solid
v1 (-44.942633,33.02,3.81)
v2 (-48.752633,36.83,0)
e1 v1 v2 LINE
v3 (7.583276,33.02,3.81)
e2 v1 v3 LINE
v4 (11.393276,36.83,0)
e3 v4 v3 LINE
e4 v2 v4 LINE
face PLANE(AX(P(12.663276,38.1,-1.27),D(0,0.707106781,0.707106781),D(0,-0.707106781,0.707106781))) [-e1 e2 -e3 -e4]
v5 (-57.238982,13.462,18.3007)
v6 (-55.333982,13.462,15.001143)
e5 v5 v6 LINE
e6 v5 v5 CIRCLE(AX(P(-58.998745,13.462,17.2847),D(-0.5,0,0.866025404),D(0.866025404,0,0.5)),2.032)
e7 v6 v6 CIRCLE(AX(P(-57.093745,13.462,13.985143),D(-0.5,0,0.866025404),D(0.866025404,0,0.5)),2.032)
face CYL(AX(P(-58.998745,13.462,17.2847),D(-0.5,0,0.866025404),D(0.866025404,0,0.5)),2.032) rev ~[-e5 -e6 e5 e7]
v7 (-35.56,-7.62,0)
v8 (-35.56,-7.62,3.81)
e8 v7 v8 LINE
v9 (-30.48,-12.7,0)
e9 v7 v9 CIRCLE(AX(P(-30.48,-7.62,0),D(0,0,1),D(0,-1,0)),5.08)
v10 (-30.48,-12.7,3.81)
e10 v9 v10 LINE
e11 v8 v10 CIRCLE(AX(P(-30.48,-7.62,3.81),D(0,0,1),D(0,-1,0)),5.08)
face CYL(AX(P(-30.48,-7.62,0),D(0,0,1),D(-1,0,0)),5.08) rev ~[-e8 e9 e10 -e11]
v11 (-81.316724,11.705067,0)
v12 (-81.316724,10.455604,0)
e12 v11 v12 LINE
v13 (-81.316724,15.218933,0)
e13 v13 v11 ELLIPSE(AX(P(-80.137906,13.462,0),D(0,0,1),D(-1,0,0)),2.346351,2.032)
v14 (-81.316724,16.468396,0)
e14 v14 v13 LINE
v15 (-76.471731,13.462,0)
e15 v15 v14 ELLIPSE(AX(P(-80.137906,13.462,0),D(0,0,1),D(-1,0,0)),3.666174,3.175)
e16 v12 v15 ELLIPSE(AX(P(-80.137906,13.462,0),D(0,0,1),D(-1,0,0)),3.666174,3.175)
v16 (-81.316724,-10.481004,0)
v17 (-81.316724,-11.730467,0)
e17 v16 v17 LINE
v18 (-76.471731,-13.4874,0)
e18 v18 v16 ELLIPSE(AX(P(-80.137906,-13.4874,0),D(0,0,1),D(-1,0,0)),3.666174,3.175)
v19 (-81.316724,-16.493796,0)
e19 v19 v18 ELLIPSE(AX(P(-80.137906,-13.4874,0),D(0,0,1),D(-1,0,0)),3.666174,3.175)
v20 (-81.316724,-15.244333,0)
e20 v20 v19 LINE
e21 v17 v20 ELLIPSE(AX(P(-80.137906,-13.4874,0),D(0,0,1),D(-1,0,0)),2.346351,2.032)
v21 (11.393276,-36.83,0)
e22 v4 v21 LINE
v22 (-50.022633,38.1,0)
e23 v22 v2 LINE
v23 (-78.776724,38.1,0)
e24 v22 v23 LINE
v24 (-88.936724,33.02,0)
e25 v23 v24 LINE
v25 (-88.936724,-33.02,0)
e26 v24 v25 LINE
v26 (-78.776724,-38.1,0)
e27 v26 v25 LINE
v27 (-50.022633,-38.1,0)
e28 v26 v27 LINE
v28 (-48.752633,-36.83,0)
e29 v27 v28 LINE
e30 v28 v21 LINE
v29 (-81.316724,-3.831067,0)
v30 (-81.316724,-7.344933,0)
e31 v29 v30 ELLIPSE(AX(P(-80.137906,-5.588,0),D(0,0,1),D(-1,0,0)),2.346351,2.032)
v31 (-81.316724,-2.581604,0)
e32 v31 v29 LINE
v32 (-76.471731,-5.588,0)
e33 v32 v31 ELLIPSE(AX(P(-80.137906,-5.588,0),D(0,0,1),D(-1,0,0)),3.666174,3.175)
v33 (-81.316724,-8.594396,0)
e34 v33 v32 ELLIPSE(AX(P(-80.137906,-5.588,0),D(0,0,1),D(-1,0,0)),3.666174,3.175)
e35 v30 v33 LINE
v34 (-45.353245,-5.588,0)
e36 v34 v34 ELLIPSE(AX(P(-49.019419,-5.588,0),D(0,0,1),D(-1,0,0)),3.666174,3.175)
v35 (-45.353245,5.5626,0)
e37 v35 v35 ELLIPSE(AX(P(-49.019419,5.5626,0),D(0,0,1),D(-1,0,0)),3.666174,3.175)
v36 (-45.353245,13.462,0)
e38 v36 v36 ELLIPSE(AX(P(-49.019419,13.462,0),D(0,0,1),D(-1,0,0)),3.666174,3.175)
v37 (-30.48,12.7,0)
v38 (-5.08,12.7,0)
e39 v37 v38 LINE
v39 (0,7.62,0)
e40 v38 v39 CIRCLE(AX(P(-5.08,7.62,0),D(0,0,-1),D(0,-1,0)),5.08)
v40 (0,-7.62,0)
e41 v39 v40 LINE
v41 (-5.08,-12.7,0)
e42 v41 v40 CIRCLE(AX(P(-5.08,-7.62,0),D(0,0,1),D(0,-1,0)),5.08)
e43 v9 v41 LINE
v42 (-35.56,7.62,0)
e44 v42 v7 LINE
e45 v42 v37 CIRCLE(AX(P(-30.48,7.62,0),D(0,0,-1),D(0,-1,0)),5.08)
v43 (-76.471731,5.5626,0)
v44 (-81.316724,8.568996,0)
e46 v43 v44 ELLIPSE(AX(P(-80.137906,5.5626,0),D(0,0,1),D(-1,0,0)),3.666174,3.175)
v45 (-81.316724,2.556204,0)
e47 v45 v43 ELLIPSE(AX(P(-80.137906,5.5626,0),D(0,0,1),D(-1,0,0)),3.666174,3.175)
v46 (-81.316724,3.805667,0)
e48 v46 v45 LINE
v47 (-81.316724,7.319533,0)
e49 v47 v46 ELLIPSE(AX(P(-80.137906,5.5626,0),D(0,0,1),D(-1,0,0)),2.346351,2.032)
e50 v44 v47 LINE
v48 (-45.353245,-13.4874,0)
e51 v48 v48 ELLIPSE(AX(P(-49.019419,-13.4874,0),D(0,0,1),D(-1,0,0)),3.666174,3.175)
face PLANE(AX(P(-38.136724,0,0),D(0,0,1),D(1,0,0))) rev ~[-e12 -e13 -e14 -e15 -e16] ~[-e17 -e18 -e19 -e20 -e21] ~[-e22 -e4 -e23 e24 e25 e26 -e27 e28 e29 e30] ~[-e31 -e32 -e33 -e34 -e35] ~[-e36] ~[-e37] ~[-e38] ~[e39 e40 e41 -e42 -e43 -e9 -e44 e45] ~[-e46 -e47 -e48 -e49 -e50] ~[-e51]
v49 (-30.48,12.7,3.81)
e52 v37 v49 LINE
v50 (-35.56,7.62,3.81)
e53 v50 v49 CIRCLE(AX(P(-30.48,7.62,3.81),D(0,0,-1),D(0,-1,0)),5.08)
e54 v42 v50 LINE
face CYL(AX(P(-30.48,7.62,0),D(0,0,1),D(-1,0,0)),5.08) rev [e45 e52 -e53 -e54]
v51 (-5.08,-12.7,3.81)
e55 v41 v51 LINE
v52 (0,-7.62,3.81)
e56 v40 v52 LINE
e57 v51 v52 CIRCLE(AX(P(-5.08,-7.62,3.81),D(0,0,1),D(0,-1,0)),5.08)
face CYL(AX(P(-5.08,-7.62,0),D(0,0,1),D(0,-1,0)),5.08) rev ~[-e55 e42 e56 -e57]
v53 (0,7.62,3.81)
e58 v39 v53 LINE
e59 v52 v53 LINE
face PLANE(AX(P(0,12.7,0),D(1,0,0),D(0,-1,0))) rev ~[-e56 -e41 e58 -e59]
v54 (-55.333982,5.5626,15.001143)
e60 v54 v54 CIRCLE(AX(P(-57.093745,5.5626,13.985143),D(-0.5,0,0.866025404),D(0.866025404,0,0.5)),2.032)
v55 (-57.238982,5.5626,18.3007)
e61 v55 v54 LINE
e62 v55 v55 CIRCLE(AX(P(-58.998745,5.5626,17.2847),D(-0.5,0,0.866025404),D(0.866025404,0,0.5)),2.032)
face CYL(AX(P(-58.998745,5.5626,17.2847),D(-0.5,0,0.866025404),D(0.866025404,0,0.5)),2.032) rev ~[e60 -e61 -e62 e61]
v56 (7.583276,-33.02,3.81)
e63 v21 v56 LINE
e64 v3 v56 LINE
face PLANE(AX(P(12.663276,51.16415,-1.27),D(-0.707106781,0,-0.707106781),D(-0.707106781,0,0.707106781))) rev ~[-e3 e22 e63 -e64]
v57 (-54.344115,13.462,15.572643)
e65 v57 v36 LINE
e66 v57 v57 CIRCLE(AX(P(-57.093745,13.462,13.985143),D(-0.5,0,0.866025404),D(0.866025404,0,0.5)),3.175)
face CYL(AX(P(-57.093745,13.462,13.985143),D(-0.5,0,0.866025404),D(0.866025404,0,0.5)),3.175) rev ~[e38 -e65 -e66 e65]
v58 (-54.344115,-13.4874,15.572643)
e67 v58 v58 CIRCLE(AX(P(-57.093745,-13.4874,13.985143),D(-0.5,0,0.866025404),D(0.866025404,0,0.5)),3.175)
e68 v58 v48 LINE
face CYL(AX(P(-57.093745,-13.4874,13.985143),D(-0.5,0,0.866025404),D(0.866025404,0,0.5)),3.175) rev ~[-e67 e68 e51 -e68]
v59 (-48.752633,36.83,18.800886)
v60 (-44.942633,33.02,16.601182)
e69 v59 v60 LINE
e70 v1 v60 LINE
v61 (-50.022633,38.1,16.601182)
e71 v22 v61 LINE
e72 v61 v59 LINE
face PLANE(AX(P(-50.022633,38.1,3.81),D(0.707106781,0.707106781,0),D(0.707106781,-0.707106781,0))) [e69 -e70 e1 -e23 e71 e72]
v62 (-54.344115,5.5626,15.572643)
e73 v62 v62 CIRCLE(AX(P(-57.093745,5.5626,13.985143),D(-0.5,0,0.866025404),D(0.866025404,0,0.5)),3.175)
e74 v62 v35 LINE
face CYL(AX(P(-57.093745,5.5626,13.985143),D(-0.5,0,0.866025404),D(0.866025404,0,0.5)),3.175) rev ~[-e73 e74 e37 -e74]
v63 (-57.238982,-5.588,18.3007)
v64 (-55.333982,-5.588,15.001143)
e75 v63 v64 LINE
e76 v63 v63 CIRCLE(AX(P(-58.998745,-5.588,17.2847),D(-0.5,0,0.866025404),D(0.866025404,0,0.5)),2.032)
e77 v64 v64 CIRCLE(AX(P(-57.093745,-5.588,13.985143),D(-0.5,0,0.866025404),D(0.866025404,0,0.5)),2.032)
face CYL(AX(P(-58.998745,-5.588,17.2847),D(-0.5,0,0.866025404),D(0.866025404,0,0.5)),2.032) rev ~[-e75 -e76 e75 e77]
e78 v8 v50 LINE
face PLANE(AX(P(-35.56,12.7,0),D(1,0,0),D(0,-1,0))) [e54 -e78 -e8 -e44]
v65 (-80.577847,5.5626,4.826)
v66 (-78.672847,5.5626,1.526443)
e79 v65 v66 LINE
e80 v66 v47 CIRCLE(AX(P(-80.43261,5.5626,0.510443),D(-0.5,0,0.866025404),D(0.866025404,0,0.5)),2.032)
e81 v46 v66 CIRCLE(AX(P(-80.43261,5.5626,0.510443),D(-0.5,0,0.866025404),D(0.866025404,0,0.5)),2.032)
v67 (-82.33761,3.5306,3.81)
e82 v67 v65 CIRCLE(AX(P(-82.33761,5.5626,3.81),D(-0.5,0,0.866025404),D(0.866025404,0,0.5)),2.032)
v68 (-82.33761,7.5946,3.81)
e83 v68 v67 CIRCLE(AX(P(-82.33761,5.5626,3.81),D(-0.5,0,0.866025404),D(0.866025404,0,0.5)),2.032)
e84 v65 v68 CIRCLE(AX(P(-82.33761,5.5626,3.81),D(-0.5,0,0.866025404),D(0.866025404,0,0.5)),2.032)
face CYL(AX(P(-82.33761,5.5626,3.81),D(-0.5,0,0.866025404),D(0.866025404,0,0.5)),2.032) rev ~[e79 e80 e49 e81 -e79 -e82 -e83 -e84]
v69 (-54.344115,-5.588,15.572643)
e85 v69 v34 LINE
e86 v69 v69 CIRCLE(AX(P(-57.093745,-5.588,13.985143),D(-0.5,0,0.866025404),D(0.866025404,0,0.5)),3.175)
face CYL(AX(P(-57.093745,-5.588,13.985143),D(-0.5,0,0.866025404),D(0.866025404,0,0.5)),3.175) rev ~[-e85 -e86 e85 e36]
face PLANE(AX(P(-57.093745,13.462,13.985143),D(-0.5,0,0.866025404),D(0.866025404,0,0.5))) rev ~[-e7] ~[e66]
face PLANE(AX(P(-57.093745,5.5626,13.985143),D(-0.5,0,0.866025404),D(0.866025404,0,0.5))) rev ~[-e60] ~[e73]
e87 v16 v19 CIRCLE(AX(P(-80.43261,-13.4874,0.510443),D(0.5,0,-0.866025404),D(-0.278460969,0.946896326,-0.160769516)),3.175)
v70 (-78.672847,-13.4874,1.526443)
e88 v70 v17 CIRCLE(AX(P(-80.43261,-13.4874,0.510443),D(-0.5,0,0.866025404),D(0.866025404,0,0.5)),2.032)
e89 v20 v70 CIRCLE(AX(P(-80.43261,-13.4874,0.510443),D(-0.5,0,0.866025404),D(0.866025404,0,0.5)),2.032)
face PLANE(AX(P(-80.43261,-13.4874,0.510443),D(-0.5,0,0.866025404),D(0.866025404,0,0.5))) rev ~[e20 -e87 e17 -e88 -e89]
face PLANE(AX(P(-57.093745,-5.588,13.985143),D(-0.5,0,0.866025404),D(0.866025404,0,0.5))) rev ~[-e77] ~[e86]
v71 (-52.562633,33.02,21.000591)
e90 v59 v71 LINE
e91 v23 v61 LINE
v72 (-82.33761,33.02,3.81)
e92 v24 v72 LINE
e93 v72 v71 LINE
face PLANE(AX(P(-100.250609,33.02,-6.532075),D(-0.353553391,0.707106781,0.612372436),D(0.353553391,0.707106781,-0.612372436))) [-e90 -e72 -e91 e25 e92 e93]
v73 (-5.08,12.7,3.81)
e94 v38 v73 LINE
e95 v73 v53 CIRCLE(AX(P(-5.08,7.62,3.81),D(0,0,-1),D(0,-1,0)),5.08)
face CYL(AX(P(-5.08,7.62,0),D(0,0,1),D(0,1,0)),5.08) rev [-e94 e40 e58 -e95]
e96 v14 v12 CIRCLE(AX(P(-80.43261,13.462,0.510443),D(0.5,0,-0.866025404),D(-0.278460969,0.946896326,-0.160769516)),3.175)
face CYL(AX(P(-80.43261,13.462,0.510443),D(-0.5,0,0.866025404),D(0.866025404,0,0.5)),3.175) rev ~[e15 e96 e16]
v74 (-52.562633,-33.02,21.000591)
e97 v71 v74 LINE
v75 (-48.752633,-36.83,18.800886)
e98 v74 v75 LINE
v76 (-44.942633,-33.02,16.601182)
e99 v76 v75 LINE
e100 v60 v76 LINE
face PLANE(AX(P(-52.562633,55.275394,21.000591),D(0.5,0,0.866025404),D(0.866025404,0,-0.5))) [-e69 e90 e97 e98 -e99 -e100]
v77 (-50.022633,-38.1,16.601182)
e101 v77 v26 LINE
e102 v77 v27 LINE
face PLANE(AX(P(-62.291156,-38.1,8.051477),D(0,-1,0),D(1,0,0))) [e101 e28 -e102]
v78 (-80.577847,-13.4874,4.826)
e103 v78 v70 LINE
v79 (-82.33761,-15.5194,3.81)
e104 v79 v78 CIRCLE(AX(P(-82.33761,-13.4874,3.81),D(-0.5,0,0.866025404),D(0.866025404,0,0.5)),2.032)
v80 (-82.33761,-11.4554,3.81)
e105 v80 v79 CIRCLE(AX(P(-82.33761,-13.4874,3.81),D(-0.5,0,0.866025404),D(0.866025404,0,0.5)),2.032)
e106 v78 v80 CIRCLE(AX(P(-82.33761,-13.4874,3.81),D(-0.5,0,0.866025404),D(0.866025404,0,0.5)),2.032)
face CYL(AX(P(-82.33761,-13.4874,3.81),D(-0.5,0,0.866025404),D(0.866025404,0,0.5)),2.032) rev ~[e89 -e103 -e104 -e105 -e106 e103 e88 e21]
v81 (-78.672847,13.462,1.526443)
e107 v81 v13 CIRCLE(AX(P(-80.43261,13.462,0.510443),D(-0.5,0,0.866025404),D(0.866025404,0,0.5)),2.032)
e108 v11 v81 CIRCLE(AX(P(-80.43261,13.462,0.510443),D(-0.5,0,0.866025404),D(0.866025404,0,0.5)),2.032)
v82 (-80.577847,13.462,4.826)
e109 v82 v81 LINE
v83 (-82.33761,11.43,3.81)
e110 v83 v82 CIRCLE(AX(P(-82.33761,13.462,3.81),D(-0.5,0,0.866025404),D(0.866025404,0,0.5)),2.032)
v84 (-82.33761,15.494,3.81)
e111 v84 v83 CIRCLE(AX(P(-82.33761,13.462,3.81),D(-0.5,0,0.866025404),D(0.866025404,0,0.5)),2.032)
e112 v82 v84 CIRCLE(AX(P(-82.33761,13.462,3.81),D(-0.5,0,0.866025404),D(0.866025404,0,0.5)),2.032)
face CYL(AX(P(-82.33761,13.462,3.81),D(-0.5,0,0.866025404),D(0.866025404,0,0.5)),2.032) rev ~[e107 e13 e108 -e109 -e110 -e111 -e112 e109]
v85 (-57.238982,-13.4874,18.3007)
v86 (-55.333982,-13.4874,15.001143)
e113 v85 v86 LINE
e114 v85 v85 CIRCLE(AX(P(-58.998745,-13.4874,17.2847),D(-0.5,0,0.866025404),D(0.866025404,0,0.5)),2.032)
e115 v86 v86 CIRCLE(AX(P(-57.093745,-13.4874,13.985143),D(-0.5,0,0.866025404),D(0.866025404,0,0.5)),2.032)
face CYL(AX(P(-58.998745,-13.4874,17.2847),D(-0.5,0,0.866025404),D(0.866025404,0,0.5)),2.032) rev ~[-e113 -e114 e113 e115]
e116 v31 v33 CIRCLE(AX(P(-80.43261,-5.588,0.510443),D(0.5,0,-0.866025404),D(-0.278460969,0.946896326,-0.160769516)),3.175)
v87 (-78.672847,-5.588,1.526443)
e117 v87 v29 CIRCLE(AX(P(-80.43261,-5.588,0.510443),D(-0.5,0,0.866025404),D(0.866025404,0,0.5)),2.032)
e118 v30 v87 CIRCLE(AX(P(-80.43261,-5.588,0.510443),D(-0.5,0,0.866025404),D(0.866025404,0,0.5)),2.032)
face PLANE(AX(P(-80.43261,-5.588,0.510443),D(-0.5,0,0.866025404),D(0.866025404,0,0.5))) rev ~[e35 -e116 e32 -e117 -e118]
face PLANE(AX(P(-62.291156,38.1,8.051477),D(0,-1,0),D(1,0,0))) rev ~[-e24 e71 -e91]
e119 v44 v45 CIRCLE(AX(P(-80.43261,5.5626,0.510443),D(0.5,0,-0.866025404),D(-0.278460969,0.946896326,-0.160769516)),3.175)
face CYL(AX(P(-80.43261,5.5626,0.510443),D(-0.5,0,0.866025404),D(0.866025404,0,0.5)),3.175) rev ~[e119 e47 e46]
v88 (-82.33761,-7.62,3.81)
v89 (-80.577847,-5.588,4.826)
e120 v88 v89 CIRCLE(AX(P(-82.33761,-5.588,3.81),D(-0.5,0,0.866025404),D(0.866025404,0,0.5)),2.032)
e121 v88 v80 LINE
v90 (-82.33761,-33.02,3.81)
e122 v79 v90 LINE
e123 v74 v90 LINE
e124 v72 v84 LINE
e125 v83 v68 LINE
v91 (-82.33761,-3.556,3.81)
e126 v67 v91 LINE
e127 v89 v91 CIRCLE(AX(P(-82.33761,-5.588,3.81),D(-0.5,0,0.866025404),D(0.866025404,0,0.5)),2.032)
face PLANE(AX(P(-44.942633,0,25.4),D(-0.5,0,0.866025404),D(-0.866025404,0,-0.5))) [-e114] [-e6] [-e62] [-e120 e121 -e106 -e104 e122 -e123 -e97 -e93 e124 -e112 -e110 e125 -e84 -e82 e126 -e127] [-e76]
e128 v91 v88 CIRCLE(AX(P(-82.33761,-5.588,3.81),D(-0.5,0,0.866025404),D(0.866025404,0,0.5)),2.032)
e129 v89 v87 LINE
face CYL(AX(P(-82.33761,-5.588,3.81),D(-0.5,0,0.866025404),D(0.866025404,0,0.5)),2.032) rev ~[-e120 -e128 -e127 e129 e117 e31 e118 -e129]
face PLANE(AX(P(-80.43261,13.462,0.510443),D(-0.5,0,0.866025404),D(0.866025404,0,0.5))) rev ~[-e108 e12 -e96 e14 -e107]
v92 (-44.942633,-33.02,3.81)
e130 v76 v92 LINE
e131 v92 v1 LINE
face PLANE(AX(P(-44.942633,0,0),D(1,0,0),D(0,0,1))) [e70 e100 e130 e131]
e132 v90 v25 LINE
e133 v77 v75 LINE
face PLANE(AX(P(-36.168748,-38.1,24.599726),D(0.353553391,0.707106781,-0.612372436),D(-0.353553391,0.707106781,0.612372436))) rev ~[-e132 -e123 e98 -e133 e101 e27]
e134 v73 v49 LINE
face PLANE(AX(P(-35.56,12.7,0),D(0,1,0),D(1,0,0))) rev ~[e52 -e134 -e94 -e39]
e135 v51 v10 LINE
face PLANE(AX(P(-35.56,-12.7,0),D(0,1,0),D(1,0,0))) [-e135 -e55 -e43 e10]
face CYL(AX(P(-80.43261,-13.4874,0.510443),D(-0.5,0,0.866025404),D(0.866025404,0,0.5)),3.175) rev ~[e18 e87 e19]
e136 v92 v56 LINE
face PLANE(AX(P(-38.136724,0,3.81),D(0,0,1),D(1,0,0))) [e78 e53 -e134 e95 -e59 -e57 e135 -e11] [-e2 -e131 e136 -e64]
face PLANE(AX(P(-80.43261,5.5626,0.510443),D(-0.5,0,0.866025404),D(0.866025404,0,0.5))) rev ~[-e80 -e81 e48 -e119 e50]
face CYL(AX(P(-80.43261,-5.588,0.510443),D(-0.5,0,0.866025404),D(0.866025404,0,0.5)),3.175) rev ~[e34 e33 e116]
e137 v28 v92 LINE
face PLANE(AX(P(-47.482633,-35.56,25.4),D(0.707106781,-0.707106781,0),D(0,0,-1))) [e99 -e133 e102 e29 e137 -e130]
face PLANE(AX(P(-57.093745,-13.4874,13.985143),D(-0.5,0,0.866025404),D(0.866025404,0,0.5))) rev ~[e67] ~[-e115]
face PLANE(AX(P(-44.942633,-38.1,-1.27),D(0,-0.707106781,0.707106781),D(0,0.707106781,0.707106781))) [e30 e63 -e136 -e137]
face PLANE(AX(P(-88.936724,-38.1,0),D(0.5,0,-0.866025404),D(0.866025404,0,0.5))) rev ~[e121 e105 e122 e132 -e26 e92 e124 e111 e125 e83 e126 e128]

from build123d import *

# Parameters (mm, degrees)
F0_W          = 101.6
F0_H          = 76.2
F2_DEPTH      = 3.81
F3_DEPTH      = 38.1
F3_DEPTH_BACK = 38.1
F5_DEPTH      = 101.6
F6_R          = 2.032
F7_DEPTH      = 25.4
F9_R          = 3.175
F9_R_2        = 2.032
F10_DEPTH     = 25.4
F11_W         = 35.56
F11_H         = 25.4
F12_DEPTH     = 25.4
F13_T1_DEPTH  = 102.3282991577
F13_T3_DEPTH  = 70.6700590666
F13_T5_DEPTH  = 34.6541495789
F13_T11_DEPTH = 70.6700590666
F13_T16_DEPTH = 47.7182991577
F14_SIZE      = 5.08
F15_T1_DEPTH  = 71.0624204228
F15_T3_DEPTH  = 110.5507880402
F15_T5_DEPTH  = 71.0624204227
F16_R         = 5.08


# Not quite as in the source:
# - a fillet or chamfer that OpenCascade refuses, or shapes differently, is made with other operations: its cross-section is extruded or revolved along the edge and cut away or added


with BuildPart() as f2:
    # F0 (on Top) → F2 (new body)
    with BuildSketch(Plane.XY):
        with Locations((-38.1367237687, 0)):
            Rectangle(F0_W, F0_H)
    extrude(amount=F2_DEPTH)

    # F1 (on Front) → F3 (join, two sides)
    with BuildSketch(Plane.XZ) as f3_sk:
        Polygon((-44.9426332565, 25.4), (-88.9367237687, 0), (-44.9426332565, 0), align=None)
    extrude(amount=F3_DEPTH)
    extrude(f3_sk.sketch, amount=-F3_DEPTH_BACK)

    # F4 (on face) → F5 (cut)
    with BuildSketch(Plane.XZ.offset(38.1)):
        Polygon((-88.9367237687, 0), (-82.3376101919, 3.81), (-88.9367237687, 3.81), align=None)
    extrude(amount=-F5_DEPTH, mode=Mode.SUBTRACT)

    # F6 (on face) → F7 (cut)
    with BuildSketch(Plane(origin=(-22.2341809422, 0, 38.5107310565), x_dir=(0.8660254038, 0, 0.5), z_dir=(-0.5, 0, 0.8660254038))):
        with Locations((-69.4014621131, -13.4874)):
            Circle(F6_R)
        with Locations((-69.4014621131, -5.588)):
            Circle(F6_R)
        with Locations((-69.4014621131, 5.5626)):
            Circle(F6_R)
        with Locations((-69.4014621131, 13.462)):
            Circle(F6_R)
        with Locations((-42.4520621131, 13.462)):
            Circle(F6_R)
        with Locations((-42.4520621131, -5.588)):
            Circle(F6_R)
        with Locations((-42.4520621131, -13.4874)):
            Circle(F6_R)
        with Locations((-42.4520621131, 5.5626)):
            Circle(F6_R)
    extrude(amount=-F7_DEPTH, mode=Mode.SUBTRACT)

    # F9 (on offset) → F10 (cut)
    with BuildSketch(Plane(origin=(-20.3291809422, 0, 35.2111742681), x_dir=(0.8660254038, 0, 0.5), z_dir=(-0.5, 0, 0.8660254038))):
        with Locations((-69.4014621131, 13.462)):
            Circle(F9_R)
        with Locations((-69.4014621131, 13.462)):
            Circle(F9_R_2, mode=Mode.SUBTRACT)
        with Locations((-69.4014621131, 5.5626)):
            Circle(F9_R)
        with Locations((-69.4014621131, 5.5626)):
            Circle(F9_R_2, mode=Mode.SUBTRACT)
        with Locations((-69.4014621131, -5.588)):
            Circle(F9_R)
        with Locations((-69.4014621131, -5.588)):
            Circle(F9_R_2, mode=Mode.SUBTRACT)
        with Locations((-69.4014621131, -13.4874)):
            Circle(F9_R)
        with Locations((-69.4014621131, -13.4874)):
            Circle(F9_R_2, mode=Mode.SUBTRACT)
        with Locations((-42.4520621131, -5.588)):
            Circle(F9_R)
        with Locations((-42.4520621131, -5.588)):
            Circle(F9_R_2, mode=Mode.SUBTRACT)
        with Locations((-42.4520621131, -13.4874)):
            Circle(F9_R)
        with Locations((-42.4520621131, -13.4874)):
            Circle(F9_R_2, mode=Mode.SUBTRACT)
        with Locations((-42.4520621131, 5.5626)):
            Circle(F9_R)
        with Locations((-42.4520621131, 5.5626)):
            Circle(F9_R_2, mode=Mode.SUBTRACT)
        with Locations((-42.4520621131, 13.462)):
            Circle(F9_R)
        with Locations((-42.4520621131, 13.462)):
            Circle(F9_R_2, mode=Mode.SUBTRACT)
    extrude(amount=-F10_DEPTH, mode=Mode.SUBTRACT)

    # F11 (on face) → F12 (cut)
    with BuildSketch(Plane(origin=(0, 0, 0), x_dir=(1, 0, 0), z_dir=(0, 0, -1))):
        with Locations((-17.78, 0)):
            Rectangle(F11_W, F11_H)
    extrude(amount=-F12_DEPTH, mode=Mode.SUBTRACT)

    # F13: chamfer of 5.08 on 4 edges, made by hand

    # F13_s2 → F13_t1 (cut)
    with BuildSketch(Plane.XZ.offset(-51.1641495789)):
        Polygon((12.6632762313, -1.27), (7.5832762313, 3.81), (12.6632762313, 3.81), align=None)
    extrude(amount=F13_T1_DEPTH, mode=Mode.SUBTRACT)

    # F13_s4 → F13_t3 (cut)
    with BuildSketch(Plane.YZ.offset(-44.9426332565)):
        Polygon((-38.1, -1.27), (-33.02, 3.81), (-38.1, 3.81), align=None)
        Polygon((38.1, -1.27), (33.02, 3.81), (38.1, 3.81), align=None)
    extrude(amount=F13_T3_DEPTH, mode=Mode.SUBTRACT)

    # F13_s6 → F13_t5 (cut)
    with BuildSketch(Plane.XY.offset(3.81)):
        Polygon((-50.0226332565, 38.1), (-44.9426332565, 33.02), (-44.9426332565, 38.1), align=None)
    extrude(amount=F13_T5_DEPTH, mode=Mode.SUBTRACT)


with BuildPart() as f13_tool9:
    # F13_s10 → F13_t11 (new body)
    with BuildSketch(Plane.YZ.offset(12.6632762313)):
        Polygon((38.1, -1.27), (33.02, 3.81), (38.1, 3.81), align=None)
    extrude(amount=-F13_T11_DEPTH)

    split(bisect_by=Plane.XY, keep=Keep.TOP)

    split(bisect_by=Plane.YZ.offset(-44.9426332565), keep=Keep.BOTTOM)


with BuildPart() as f13_tool14:
    # F13_s15 → F13_t16 (new body)
    with BuildSketch(Plane.XY.offset(-9.2541495789)):
        Polygon((-50.0226332565, 38.1), (-44.9426332565, 33.02), (-44.9426332565, 38.1), align=None)
    extrude(amount=F13_T16_DEPTH)

    split(bisect_by=Plane.XY, keep=Keep.TOP)

    split(bisect_by=Plane.XY.offset(3.81), keep=Keep.BOTTOM)


with BuildPart() as f13_tool9_1:
    add(f13_tool9.part)

    # F13_t19: intersect F13_tool14
    add(f13_tool14.part, mode=Mode.INTERSECT)


with BuildPart() as f2_1:
    add(f2.part)

    # F13_t7: cut F13_tool9
    add(f13_tool9_1.part, mode=Mode.SUBTRACT)

    # F14
    f14_edges = [f2_1.edges().sort_by_distance(p)[0] for p in [
        (-44.942633, -38.1, 12.7),
    ]]
    chamfer(f14_edges, length=F14_SIZE)

    # F15: chamfer of 5.08 on 3 edges, made by hand

    # F15_s2 → F15_t1 (cut)
    with BuildSketch(Plane(origin=(-16.4745669001, 0, -9.5115956346), x_dir=(0, 1, 0), z_dir=(-0.8660254038, 0, -0.5))):
        Polygon((-38.1, -39.3883618844), (-33.02, -44.4683618844), (-38.1, -44.4683618844), align=None)
    extrude(amount=F15_T1_DEPTH, mode=Mode.SUBTRACT)

    # F15_s4 → F15_t3 (cut)
    with BuildSketch(Plane.XZ.offset(-55.2753940201)):
        Polygon((-52.5626332565, 21.0005909488), (-44.9426332565, 16.6011818976), (-44.9426332565, 25.4), align=None)
    extrude(amount=F15_T3_DEPTH, mode=Mode.SUBTRACT)

    # F15_s6 → F15_t5 (cut)
    with BuildSketch(Plane(origin=(-78.0164282407, 0, -45.042805846), x_dir=(0, 1, 0), z_dir=(0.8660254038, 0, 0.5))):
        Polygon((33.02, 44.4683618844), (38.1, 39.3883618844), (38.1, 44.4683618844), align=None)
    extrude(amount=F15_T5_DEPTH, mode=Mode.SUBTRACT)

    # F16
    f16_edges = [f2_1.edges().sort_by_distance(p)[0] for p in [
        (-35.56, -12.7, 1.905),
        (-35.56, 12.7, 1.905),
        (0, 12.7, 1.905),
        (0, -12.7, 1.905),
    ]]
    fillet(f16_edges, radius=F16_R)


solid = f2_1.part
